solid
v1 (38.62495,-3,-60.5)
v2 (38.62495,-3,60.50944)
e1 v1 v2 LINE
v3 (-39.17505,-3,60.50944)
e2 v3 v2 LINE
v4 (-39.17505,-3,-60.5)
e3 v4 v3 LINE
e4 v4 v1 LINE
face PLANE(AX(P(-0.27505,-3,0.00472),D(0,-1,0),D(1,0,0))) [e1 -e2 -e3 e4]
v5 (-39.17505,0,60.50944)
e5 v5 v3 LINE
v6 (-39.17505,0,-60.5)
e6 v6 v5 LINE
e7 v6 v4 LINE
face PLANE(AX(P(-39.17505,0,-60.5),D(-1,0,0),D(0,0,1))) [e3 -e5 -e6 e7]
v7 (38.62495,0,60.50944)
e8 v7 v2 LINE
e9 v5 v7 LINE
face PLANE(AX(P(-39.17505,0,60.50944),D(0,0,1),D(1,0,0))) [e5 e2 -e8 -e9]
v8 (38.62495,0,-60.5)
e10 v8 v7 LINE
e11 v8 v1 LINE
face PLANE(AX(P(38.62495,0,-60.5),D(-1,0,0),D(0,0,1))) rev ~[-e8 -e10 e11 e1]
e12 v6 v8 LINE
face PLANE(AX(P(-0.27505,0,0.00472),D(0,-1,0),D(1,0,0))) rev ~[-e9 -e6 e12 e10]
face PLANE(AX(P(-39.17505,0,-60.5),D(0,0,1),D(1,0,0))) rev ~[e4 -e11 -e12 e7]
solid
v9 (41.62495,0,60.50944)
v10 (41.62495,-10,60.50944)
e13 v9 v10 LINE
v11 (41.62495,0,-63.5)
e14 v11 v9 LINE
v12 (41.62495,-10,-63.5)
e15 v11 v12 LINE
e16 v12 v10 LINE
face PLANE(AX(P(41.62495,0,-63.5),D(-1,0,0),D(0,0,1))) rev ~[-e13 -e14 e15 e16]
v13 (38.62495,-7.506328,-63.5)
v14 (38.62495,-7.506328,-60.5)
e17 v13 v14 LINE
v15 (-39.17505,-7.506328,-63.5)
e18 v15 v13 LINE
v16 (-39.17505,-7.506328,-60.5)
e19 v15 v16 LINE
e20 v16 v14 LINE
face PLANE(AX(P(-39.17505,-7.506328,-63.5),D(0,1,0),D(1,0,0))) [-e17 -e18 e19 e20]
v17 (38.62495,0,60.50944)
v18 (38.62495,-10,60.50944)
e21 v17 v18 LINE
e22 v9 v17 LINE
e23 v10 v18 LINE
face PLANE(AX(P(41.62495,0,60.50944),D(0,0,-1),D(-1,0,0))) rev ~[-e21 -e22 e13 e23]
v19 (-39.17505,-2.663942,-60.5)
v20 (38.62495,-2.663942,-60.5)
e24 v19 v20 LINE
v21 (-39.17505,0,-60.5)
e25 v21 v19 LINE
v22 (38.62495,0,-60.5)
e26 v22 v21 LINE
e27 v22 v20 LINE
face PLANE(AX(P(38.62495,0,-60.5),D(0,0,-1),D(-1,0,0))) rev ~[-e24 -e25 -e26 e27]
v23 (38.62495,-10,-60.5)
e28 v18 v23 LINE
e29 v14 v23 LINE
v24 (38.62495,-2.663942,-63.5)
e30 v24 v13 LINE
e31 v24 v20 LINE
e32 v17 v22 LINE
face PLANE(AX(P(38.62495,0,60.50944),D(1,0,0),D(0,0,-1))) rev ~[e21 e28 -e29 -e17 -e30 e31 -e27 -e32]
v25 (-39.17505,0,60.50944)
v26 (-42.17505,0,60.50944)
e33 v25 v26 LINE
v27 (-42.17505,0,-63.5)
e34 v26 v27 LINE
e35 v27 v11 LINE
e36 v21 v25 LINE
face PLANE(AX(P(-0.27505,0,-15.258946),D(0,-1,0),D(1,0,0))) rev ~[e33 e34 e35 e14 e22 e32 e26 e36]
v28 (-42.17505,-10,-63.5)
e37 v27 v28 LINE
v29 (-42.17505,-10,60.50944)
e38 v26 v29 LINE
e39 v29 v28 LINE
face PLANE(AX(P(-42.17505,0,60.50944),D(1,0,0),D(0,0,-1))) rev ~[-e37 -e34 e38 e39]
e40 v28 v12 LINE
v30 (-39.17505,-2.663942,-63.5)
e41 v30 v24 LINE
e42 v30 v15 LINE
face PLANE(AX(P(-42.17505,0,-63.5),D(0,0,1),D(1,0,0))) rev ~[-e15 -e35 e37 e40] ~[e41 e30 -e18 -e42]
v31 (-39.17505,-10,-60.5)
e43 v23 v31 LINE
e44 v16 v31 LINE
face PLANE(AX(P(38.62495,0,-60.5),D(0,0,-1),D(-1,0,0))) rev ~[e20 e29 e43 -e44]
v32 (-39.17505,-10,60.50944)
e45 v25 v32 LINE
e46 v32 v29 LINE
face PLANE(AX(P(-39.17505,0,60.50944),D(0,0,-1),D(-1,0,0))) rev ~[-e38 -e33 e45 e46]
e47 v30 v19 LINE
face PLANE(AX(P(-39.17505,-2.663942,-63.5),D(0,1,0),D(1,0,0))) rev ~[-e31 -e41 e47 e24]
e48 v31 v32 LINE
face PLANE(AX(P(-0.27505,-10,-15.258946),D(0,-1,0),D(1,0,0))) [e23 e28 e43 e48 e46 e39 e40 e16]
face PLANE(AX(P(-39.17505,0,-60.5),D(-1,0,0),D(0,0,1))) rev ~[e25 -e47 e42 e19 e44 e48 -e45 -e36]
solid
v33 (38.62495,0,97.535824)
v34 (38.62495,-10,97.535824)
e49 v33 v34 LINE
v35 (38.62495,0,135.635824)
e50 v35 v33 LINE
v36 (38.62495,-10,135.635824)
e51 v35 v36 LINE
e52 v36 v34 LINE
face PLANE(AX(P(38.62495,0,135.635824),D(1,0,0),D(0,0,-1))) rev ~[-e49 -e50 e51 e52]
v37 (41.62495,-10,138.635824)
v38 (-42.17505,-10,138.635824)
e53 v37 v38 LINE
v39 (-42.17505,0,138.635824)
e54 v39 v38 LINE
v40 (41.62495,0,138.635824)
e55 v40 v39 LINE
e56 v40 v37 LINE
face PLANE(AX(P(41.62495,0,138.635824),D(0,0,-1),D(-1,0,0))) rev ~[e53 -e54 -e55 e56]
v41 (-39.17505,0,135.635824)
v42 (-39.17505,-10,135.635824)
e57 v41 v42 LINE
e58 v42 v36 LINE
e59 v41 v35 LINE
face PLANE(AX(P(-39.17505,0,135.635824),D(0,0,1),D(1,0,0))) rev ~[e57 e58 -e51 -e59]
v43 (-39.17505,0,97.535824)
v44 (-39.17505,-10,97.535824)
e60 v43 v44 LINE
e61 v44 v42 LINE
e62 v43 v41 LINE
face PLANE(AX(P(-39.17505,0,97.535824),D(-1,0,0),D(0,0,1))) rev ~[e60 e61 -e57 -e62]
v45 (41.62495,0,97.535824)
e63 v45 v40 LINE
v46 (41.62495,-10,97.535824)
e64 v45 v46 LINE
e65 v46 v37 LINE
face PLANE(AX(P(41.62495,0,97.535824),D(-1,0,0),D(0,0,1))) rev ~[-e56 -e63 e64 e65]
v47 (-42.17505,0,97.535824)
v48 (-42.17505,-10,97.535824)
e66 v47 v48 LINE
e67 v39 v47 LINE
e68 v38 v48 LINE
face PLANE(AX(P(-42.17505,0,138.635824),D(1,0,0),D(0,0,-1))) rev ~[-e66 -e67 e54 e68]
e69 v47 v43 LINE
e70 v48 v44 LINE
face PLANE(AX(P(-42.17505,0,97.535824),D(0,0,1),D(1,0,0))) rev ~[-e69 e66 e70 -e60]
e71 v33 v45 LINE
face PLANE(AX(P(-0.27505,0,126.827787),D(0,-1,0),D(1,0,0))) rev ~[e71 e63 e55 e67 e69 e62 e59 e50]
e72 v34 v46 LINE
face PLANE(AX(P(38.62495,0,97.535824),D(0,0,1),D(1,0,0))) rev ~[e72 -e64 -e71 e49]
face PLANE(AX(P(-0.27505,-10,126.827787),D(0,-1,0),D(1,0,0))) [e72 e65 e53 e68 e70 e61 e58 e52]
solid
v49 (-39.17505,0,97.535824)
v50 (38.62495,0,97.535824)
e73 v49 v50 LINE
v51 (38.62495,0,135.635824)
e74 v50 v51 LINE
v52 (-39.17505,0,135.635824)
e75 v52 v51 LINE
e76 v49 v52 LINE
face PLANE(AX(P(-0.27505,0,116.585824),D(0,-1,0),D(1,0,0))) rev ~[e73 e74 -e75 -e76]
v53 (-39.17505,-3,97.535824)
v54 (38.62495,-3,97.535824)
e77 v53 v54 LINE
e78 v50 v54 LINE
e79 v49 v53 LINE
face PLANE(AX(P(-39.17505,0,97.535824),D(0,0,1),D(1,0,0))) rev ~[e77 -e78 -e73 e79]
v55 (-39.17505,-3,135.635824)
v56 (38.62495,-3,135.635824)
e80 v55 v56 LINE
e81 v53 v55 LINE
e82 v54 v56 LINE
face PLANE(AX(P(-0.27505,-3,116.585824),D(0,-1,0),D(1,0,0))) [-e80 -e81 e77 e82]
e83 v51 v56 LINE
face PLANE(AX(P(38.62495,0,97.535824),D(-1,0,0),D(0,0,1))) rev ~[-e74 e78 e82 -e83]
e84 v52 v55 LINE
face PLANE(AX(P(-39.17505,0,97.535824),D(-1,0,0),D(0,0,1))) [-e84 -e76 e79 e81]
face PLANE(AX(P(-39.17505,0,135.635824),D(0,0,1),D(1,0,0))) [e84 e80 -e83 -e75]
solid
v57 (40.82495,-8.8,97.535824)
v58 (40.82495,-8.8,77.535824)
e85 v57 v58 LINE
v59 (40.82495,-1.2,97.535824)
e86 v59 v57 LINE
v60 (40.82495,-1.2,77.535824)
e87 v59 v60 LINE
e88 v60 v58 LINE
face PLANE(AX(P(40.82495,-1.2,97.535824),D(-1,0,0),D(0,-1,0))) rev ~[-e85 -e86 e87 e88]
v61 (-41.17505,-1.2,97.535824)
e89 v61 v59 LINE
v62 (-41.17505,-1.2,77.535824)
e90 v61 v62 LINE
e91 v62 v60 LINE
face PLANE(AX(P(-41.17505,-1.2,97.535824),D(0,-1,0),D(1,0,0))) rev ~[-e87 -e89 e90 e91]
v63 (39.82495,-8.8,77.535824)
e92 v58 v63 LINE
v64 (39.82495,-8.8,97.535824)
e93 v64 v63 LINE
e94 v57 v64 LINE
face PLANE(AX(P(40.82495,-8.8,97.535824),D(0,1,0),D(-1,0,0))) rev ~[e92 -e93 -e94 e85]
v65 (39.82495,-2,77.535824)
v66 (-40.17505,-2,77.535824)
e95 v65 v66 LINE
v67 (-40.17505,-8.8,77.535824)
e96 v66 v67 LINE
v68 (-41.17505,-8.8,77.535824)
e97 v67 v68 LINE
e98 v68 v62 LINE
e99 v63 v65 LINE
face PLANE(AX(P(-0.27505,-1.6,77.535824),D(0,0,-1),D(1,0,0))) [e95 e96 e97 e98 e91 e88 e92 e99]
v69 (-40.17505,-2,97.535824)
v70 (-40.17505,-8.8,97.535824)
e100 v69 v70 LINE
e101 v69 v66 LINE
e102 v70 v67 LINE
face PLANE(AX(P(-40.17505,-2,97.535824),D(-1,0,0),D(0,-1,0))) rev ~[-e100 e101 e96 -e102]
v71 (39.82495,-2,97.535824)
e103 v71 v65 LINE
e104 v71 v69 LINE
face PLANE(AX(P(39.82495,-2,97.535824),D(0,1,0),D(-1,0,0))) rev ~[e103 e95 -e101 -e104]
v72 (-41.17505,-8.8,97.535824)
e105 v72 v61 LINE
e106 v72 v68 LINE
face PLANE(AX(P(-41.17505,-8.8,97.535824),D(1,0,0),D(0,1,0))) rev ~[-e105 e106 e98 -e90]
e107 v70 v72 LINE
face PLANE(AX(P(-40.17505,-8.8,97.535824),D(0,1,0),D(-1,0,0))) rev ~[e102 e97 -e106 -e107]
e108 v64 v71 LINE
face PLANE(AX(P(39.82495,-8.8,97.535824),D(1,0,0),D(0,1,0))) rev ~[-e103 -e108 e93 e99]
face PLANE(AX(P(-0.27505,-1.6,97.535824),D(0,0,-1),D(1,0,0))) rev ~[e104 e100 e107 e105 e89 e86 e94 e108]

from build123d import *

# Parameters (mm, degrees)
F0_W     = 77.8
F0_H     = 121.0094395578
F1_DEPTH = 3
F0_H_2   = 38.1
F2_DEPTH = 10
F3_W     = 77.8
F3_H     = 4.8423867873
F4_DEPTH = 25
F5_W     = 77.8
F5_H     = 0.8
F6_DEPTH = 20


with BuildPart() as f1:
    # F0 (on Front) → F1 (new body)
    with BuildSketch(Plane.XZ):
        with Locations((-0.2750502467, 0.0047197789)):
            Rectangle(F0_W, F0_H)
    extrude(amount=F1_DEPTH)


with BuildPart() as f1b:
    # F0 (on Front) → F1, piece 2 (new body)
    with BuildSketch(Plane.XZ):
        with Locations((-0.2750502467, 116.5858240604)):
            Rectangle(F0_W, F0_H_2)
    extrude(amount=F1_DEPTH)


with BuildPart() as f2:
    # F0 (on Front) → F2 (new body)
    with BuildSketch(Plane.XZ):
        Polygon((38.6249497533, 60.5094395578), (38.6249497533, -60.5), (-39.1750502467, -60.5), (-39.1750502467, 60.5094395578), (-42.1750502467, 60.5094395578), (-42.1750502467, -63.5), (41.6249497533, -63.5), (41.6249497533, 60.5094395578), align=None)
    extrude(amount=F2_DEPTH)

    # F3 (on face) → F4 (cut)
    with BuildSketch(Plane(origin=(0, 0, -63.5), x_dir=(1, 0, 0), z_dir=(0, 0, -1))):
        with Locations((-0.2750502467, 5.085134937)):
            Rectangle(F3_W, F3_H)
    extrude(amount=-F4_DEPTH, mode=Mode.SUBTRACT)


with BuildPart() as f2b:
    # F0 (on Front) → F2, piece 2 (new body)
    with BuildSketch(Plane.XZ):
        Polygon((38.6249497533, 135.6358240604), (38.6249497533, 97.5358240604), (41.6249497533, 97.5358240604), (41.6249497533, 138.6358240604), (-42.1750502467, 138.6358240604), (-42.1750502467, 97.5358240604), (-39.1750502467, 97.5358240604), (-39.1750502467, 135.6358240604), align=None)
    extrude(amount=F2_DEPTH)


with BuildPart() as f6:
    # F5 (on face) → F6 (new body)
    with BuildSketch(Plane(origin=(0, 0, 97.5358240604), x_dir=(1, 0, 0), z_dir=(0, 0, -1))):
        with Locations((-0.2750502467, 1.6)):
            Rectangle(F5_W, F5_H)
        Polygon((39.8249497533, 2), (38.6249497533, 2), (38.6249497533, 1.2), (39.8249497533, 1.2), (40.8249497533, 1.2), (40.8249497533, 8.8), (39.8249497533, 8.8), align=None)
        Polygon((-39.1750502467, 2), (-40.1750502467, 2), (-40.1750502467, 8.8), (-41.1750502467, 8.8), (-41.1750502467, 1.2), (-39.1750502467, 1.2), align=None)
    extrude(amount=F6_DEPTH)


solid = Compound([f1.part, f1b.part, f2.part, f2b.part, f6.part])
